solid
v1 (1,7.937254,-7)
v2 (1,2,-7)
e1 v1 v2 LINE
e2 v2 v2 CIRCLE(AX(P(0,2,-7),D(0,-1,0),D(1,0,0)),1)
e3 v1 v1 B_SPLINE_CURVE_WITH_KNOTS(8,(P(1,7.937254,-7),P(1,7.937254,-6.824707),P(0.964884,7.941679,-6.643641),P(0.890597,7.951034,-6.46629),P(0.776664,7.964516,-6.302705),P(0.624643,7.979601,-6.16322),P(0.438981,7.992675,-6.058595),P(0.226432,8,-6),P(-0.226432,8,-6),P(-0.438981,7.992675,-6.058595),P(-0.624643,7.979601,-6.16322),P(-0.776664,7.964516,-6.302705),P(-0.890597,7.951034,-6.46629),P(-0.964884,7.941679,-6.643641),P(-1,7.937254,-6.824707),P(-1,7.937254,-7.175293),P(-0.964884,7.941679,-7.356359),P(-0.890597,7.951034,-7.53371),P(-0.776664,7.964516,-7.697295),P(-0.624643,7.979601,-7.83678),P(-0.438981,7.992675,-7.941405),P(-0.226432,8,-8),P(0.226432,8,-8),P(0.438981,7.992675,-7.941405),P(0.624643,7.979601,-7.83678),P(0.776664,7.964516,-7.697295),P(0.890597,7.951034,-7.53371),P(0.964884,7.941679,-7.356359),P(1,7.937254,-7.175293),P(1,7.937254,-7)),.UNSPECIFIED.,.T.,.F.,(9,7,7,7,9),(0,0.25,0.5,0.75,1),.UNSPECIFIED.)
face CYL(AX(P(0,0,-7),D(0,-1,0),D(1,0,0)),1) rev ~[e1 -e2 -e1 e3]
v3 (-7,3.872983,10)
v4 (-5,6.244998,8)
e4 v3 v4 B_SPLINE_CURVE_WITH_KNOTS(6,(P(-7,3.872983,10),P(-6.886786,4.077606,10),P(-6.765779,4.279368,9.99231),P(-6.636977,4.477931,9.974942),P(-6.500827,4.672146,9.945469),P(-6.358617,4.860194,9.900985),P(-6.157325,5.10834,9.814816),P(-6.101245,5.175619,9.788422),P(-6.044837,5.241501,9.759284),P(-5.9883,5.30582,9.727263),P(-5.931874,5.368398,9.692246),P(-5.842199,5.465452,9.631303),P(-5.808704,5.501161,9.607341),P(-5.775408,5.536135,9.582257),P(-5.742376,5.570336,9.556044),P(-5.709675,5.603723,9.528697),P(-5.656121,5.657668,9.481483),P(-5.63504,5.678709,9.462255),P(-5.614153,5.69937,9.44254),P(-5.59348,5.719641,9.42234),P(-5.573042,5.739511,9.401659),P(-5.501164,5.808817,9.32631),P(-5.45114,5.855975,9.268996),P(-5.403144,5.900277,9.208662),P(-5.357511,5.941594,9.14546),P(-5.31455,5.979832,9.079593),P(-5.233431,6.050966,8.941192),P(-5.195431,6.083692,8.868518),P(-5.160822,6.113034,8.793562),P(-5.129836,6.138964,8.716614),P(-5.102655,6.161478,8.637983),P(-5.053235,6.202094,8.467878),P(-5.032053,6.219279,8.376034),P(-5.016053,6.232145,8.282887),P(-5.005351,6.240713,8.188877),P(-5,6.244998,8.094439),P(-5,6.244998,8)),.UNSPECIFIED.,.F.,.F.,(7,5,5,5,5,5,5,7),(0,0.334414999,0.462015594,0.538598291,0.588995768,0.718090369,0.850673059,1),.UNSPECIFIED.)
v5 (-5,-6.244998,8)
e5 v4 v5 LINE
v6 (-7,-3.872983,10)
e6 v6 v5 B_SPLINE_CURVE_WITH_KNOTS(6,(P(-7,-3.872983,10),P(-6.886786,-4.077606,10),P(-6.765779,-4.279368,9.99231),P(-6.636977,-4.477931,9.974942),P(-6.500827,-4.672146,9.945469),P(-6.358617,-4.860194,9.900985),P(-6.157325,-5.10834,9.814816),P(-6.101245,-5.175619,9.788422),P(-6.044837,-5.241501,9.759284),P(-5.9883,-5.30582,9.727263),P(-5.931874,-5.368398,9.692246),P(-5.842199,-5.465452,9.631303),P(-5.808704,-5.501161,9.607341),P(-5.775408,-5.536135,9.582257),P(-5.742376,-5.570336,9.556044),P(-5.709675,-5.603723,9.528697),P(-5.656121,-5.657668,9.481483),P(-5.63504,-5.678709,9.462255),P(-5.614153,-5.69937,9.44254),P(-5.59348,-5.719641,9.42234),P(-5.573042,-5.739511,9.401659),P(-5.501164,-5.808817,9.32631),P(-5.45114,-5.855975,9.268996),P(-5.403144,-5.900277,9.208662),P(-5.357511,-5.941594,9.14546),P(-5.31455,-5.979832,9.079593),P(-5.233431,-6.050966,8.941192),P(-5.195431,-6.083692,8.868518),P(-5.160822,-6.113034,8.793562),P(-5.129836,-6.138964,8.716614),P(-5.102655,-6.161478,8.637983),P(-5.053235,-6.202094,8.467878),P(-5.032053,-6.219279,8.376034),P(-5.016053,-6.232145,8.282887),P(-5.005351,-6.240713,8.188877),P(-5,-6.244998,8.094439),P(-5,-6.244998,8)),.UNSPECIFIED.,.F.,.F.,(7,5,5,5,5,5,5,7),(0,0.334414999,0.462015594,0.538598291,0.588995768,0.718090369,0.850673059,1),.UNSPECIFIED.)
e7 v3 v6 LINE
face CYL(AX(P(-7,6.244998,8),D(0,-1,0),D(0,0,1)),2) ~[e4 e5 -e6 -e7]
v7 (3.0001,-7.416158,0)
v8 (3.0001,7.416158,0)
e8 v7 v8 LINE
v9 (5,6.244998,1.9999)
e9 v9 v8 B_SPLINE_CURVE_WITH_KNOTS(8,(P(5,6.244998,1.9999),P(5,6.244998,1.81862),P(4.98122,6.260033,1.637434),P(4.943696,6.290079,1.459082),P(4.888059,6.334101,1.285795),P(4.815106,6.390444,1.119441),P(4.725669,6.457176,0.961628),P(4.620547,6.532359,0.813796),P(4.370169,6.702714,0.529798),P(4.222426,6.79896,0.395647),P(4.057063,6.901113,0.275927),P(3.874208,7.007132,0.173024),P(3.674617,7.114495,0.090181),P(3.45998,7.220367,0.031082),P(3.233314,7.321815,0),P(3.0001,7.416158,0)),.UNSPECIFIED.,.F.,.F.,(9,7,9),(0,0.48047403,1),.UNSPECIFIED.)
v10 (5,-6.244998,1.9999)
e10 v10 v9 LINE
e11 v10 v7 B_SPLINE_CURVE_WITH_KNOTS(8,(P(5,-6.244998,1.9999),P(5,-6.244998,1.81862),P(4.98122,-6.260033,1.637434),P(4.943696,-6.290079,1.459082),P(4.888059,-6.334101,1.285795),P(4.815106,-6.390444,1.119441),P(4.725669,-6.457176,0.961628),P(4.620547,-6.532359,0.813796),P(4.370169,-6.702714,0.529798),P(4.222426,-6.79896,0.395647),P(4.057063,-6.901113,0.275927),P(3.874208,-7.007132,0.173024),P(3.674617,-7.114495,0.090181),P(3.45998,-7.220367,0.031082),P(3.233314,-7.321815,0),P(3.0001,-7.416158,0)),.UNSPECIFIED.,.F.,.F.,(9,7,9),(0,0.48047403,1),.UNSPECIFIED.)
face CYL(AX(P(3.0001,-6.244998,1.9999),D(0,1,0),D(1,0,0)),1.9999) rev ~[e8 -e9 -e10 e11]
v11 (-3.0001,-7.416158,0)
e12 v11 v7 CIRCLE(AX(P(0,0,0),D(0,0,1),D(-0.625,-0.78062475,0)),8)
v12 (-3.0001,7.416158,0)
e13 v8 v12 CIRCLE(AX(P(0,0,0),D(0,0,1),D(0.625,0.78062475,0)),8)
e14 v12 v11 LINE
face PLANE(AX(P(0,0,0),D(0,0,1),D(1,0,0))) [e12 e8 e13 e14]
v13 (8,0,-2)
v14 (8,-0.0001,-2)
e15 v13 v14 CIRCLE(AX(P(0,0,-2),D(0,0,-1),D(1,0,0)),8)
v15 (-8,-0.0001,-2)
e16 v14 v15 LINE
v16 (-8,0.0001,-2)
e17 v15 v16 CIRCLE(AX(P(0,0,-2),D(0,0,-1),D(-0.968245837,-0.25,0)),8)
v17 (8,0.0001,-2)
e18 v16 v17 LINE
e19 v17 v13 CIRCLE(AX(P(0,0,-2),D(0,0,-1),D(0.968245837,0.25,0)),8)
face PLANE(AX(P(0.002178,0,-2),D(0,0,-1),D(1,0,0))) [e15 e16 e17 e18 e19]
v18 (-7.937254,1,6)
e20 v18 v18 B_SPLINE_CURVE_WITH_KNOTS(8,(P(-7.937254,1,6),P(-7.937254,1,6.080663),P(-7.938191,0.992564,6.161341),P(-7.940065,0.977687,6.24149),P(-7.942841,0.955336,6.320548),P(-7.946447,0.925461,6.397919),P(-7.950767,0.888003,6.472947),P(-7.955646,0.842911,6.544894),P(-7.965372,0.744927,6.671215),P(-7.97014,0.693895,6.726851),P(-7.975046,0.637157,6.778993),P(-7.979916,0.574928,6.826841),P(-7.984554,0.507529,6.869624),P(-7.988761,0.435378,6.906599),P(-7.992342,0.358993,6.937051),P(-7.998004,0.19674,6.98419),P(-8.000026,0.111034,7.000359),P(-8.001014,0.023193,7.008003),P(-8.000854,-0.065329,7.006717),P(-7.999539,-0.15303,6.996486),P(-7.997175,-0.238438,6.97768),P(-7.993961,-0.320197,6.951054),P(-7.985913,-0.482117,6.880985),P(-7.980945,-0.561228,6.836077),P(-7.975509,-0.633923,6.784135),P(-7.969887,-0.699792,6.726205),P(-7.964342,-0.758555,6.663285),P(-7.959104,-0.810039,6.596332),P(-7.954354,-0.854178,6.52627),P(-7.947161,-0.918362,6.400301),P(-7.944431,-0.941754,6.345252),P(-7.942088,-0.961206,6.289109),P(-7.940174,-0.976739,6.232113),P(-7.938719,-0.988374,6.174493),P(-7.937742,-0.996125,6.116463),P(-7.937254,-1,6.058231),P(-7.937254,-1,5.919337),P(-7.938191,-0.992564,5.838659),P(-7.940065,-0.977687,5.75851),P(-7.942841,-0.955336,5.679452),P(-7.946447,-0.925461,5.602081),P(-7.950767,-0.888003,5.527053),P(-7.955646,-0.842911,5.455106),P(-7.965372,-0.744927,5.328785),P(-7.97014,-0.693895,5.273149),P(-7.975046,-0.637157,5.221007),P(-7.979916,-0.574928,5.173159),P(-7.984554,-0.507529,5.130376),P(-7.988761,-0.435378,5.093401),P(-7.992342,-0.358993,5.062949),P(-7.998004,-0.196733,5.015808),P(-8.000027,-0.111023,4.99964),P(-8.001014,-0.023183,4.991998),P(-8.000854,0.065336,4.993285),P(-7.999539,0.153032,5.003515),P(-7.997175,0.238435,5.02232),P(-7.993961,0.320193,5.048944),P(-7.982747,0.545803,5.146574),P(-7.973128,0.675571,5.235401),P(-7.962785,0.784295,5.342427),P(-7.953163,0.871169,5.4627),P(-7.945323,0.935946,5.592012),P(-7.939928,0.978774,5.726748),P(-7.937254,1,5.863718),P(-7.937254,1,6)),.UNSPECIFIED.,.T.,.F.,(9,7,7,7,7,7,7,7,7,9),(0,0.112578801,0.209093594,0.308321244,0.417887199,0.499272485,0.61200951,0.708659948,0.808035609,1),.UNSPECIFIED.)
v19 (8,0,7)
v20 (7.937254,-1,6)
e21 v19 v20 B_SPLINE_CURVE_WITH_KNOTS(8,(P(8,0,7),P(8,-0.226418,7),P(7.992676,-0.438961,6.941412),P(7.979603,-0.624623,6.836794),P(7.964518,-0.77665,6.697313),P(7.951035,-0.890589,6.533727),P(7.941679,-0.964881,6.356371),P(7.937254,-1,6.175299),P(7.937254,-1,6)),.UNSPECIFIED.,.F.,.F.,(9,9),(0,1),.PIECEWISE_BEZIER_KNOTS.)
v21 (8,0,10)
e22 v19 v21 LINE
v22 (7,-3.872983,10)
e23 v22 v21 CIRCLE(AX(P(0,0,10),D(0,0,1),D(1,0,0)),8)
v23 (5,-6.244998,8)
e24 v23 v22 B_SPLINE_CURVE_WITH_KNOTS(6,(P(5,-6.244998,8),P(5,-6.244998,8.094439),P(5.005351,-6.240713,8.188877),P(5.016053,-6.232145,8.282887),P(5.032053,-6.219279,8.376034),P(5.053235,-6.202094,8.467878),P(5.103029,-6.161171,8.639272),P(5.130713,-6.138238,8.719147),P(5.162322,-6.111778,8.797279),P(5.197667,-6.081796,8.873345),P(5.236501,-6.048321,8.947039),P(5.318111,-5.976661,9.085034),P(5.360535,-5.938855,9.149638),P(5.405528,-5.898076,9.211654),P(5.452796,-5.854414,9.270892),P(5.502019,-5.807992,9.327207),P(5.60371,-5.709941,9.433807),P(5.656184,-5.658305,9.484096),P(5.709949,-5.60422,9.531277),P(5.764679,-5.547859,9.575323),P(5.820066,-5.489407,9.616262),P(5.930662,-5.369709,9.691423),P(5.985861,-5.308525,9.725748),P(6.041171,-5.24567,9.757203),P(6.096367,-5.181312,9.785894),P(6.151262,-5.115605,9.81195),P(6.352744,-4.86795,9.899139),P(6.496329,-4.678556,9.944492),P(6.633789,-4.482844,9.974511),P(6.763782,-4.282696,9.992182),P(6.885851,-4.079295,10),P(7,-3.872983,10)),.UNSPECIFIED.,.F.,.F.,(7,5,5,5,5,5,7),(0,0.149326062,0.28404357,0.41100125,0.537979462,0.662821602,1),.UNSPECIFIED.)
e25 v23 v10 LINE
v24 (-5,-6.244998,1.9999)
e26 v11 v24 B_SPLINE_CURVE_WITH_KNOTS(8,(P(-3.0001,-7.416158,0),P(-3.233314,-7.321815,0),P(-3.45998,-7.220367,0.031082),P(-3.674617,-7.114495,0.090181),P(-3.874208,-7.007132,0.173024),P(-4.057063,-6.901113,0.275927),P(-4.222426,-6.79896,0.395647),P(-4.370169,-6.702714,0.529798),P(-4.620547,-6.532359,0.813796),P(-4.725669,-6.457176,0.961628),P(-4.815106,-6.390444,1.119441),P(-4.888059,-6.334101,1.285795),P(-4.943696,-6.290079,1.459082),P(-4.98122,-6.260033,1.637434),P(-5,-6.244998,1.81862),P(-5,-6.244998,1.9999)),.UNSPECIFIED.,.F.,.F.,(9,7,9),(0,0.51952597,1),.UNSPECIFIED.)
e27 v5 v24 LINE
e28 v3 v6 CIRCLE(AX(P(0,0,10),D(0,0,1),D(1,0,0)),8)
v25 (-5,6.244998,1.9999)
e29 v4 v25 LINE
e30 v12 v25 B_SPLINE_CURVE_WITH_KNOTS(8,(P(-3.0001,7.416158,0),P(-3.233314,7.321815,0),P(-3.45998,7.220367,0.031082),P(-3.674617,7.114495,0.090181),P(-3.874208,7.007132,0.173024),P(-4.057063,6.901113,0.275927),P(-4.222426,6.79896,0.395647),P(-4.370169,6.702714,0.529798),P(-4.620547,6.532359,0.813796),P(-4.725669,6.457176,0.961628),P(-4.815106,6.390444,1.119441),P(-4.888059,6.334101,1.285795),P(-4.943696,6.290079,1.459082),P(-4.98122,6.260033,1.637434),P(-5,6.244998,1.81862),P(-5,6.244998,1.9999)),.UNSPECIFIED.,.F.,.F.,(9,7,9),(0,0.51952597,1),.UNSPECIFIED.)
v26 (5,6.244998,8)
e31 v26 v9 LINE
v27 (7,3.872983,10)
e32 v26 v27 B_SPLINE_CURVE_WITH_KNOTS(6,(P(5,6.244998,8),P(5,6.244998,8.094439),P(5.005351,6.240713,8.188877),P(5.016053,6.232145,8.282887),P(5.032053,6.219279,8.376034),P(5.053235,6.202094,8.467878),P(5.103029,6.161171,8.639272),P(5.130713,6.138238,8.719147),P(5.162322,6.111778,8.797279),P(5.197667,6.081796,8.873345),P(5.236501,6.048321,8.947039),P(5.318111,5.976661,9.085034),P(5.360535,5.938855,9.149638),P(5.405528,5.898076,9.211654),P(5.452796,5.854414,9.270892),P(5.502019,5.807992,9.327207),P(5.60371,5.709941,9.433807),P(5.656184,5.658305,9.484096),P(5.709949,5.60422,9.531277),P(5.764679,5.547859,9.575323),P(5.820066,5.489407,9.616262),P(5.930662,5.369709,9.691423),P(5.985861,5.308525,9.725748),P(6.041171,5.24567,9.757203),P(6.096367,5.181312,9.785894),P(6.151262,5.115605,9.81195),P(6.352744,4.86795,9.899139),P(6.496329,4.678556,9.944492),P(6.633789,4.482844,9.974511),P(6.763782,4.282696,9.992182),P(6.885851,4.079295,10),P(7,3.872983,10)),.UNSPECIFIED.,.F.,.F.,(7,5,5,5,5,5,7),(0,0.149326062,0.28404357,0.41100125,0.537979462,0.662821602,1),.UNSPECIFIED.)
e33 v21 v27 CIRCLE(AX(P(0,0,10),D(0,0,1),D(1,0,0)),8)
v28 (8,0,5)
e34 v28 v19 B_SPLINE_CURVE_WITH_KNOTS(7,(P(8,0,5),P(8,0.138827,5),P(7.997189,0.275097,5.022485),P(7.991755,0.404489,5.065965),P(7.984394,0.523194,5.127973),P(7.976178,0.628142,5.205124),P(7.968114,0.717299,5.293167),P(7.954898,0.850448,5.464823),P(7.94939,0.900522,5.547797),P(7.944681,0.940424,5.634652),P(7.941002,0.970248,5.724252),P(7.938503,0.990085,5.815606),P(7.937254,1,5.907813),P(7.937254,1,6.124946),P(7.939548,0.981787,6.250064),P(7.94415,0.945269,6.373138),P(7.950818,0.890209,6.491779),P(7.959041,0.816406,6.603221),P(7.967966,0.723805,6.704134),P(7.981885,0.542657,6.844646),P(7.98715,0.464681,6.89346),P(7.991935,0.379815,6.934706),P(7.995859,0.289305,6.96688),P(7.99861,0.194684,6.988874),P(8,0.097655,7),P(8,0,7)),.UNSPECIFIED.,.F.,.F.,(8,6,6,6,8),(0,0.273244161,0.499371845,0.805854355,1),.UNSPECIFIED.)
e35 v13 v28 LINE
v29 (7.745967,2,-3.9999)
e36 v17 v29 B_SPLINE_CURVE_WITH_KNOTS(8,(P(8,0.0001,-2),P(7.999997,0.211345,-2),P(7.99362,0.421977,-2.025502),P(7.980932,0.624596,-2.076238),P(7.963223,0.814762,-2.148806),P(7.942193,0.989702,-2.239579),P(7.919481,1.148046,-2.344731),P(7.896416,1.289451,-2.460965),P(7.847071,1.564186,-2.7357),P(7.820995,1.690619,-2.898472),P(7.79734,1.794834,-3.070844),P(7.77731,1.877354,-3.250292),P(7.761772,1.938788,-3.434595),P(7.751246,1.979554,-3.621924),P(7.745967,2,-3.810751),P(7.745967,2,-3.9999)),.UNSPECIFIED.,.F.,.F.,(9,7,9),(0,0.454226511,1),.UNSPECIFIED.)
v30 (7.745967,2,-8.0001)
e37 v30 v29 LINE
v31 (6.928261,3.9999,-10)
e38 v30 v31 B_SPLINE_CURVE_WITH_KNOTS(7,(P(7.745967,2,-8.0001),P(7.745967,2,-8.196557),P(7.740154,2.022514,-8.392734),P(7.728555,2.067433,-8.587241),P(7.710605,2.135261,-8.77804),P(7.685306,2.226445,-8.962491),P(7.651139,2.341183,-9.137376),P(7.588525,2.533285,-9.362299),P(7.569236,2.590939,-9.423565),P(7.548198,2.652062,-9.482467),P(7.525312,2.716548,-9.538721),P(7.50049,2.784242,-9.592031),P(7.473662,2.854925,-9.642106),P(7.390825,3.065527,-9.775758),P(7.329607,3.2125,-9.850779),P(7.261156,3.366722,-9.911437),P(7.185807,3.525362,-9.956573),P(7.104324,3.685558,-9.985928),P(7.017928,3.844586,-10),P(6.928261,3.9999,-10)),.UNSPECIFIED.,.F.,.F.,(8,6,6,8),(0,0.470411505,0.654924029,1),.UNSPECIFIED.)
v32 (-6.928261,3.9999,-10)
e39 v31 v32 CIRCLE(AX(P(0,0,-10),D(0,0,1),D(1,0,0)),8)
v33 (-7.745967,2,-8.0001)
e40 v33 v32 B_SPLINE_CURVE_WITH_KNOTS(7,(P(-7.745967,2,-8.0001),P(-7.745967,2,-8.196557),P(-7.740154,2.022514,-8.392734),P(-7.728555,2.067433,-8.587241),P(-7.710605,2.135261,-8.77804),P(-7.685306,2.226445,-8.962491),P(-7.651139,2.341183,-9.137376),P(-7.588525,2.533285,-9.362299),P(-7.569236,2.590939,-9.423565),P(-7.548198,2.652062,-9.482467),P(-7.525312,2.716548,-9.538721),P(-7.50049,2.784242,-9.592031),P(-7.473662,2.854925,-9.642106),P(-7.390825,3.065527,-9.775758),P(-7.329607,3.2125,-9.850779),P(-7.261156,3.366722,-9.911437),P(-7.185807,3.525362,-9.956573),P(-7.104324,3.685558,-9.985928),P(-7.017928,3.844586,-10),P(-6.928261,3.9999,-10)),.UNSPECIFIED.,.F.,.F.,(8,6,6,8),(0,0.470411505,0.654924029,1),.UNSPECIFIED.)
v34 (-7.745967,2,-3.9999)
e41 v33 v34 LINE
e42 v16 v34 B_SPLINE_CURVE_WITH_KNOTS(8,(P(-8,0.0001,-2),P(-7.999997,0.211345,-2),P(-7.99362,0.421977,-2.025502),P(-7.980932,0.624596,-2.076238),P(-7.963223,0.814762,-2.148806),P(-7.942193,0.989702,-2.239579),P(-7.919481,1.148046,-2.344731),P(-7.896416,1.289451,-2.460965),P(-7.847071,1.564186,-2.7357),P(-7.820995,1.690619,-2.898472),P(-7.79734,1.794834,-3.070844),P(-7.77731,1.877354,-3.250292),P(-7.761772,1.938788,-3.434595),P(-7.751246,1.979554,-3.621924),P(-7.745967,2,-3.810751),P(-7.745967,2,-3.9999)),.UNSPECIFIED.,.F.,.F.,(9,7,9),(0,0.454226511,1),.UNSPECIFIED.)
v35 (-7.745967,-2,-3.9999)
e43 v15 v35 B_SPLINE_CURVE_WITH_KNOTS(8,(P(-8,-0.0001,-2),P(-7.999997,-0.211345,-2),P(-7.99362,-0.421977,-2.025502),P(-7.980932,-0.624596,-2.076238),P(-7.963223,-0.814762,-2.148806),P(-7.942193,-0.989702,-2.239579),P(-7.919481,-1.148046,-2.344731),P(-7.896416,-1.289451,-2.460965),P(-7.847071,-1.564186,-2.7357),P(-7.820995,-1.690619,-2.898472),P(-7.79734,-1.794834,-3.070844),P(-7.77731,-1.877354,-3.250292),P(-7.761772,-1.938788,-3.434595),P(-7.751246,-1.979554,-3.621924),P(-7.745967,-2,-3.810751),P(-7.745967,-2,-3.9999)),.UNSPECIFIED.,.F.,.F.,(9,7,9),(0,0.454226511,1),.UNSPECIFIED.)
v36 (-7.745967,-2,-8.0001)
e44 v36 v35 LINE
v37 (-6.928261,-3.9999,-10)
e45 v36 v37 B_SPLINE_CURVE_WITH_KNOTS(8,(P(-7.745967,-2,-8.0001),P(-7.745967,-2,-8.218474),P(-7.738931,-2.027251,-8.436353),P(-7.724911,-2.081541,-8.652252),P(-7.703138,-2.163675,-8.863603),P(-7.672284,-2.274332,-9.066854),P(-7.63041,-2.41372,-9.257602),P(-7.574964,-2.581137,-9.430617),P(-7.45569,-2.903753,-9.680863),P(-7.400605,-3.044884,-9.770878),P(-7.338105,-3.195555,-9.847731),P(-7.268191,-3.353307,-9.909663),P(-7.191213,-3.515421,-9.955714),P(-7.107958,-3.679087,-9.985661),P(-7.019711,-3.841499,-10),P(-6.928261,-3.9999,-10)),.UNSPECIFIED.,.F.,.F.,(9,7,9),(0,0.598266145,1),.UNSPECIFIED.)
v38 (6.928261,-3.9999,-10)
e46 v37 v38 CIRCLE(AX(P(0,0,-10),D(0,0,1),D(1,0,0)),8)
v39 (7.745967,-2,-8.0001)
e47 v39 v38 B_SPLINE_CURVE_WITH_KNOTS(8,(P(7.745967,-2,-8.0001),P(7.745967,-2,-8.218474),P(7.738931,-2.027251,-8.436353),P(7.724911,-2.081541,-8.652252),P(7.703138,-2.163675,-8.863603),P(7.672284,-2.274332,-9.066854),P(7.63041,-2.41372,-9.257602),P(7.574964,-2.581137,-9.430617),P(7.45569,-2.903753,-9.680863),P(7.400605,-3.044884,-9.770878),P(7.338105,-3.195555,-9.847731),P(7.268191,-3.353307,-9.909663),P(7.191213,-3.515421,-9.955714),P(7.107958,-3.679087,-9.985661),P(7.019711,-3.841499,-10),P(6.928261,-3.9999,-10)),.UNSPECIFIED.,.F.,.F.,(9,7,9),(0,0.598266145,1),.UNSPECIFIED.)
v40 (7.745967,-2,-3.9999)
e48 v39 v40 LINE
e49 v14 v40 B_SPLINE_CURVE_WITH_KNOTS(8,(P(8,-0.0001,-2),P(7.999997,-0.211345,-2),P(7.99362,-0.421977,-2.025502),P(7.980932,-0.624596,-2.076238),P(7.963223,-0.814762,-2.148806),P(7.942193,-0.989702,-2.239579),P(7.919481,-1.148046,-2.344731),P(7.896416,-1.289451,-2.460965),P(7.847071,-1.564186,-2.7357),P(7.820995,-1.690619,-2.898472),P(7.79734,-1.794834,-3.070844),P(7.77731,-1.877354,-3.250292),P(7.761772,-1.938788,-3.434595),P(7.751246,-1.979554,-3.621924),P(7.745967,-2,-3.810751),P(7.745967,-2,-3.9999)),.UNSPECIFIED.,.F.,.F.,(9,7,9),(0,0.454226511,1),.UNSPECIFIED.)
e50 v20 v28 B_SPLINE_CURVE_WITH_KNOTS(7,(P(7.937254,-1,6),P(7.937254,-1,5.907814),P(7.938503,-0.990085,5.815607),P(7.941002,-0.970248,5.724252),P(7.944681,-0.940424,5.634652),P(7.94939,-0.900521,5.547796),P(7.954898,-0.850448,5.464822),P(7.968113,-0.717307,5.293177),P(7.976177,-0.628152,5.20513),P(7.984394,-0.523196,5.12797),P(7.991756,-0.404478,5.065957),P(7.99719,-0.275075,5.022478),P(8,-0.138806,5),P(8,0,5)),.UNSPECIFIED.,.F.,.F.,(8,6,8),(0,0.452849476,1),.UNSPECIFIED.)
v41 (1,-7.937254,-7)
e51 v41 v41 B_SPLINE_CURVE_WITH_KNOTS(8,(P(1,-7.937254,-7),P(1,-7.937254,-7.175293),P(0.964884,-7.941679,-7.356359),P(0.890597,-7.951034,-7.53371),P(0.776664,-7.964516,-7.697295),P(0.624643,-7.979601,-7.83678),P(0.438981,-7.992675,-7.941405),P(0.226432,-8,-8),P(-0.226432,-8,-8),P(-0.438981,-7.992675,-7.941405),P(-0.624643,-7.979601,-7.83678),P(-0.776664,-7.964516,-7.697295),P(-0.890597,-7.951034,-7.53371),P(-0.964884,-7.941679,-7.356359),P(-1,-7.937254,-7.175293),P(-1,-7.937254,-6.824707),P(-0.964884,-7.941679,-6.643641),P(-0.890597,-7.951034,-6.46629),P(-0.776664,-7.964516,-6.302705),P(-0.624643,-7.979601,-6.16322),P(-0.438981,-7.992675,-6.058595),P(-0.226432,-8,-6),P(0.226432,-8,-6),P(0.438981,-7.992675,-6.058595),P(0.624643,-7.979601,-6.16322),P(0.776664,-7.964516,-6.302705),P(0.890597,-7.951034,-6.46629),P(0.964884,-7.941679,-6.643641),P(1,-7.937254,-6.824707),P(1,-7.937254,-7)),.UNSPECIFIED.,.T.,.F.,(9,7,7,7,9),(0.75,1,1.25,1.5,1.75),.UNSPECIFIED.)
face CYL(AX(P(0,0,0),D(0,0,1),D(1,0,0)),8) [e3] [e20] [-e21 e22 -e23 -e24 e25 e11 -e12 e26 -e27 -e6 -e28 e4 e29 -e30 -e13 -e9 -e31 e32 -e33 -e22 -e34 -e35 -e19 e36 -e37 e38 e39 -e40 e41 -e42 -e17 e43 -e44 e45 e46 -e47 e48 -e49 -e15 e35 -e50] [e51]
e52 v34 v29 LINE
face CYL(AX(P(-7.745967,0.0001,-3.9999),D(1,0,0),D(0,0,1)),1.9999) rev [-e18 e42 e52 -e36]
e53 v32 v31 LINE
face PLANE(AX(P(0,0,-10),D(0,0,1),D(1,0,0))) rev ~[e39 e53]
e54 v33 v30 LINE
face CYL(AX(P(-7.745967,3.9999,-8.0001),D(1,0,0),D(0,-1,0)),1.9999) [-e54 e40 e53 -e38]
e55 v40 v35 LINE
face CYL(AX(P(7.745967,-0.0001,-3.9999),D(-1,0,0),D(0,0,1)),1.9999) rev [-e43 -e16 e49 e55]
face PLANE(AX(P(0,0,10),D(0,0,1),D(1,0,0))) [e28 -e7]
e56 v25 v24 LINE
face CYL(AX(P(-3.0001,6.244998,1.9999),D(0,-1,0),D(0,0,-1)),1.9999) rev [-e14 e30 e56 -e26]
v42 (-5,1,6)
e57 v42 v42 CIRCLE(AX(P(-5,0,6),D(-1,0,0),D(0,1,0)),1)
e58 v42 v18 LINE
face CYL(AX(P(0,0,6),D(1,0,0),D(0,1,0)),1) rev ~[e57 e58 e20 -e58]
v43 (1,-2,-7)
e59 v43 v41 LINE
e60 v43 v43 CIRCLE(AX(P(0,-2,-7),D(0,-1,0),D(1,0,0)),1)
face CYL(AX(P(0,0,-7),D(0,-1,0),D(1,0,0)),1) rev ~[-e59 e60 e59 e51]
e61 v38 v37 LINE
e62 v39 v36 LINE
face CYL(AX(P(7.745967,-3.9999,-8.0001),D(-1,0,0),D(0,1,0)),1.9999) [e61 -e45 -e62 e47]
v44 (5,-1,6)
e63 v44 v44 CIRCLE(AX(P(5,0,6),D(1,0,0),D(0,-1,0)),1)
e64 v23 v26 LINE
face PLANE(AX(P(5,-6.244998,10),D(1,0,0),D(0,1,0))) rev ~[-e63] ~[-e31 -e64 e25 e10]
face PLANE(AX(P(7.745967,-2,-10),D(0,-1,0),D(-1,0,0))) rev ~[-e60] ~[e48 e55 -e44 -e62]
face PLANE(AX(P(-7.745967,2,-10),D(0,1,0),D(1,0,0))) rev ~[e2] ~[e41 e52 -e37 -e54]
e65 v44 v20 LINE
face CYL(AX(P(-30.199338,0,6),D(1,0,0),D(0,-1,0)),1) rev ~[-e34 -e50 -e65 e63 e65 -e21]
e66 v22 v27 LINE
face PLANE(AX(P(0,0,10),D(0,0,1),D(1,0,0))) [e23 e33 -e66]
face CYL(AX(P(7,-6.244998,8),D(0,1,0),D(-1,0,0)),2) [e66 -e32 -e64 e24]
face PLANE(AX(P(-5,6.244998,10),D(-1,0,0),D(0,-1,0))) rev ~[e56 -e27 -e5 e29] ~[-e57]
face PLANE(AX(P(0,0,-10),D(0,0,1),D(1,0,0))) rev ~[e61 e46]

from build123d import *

# Parameters (mm, degrees)
F0_R      = 8
F1_DEPTH  = 10
F3_DEPTH  = 10
F5_D      = 2
F5_DEPTH  = 8.001
F6_D      = 2
F7_R      = 2
F9_DEPTH  = 8
F10_R     = 1.9999
F11_R     = 1
F12_DEPTH = 8


# Not quite as in the source:
# - a fillet or chamfer is up to 0.001 mm smaller than in the source, because OpenCascade refuses the exact size
# - a feature names something its author has since deleted; it is built from what else it names


with BuildPart() as f1:
    # F0 (on Top) → F1 (new body, symmetric)
    with BuildSketch(Plane.XY):
        Circle(F0_R)
    extrude(amount=F1_DEPTH, both=True)

    # F2 (on face) → F3 (cut)
    with BuildSketch(Plane.XY.offset(10)):
        with BuildLine():
            ThreePointArc((5, 6.2449979984), (0, 8), (-5, 6.2449979984))
            Line((-5, 6.2449979984), (-5, -6.2449979984))
            ThreePointArc((-5, -6.2449979984), (0, -8), (5, -6.2449979984))
            Line((5, -6.2449979984), (5, 6.2449979984))
        make_face()
    extrude(amount=-F3_DEPTH, mode=Mode.SUBTRACT)

    # F5 (through all, one way)
    with BuildSketch(Plane.YZ):
        with Locations((0, 6)):
            Circle(F5_D / 2)
    extrude(amount=-F5_DEPTH, mode=Mode.SUBTRACT)

    # F6 (through all)
    with Locations(Plane(origin=(0, 0, 0), x_dir=(0, 1, 0), z_dir=(-1, 0, 0))):
        with Locations((0, -6)):
            Hole(F6_D / 2)

    # F7
    f7_edges = [f1.edges().sort_by_distance(p)[0] for p in [
        (5, 0, 10),
        (-5, 0, 10),
    ]]
    fillet(f7_edges, radius=F7_R)

    # F8 (on face) → F9 (cut)
    with BuildSketch(Plane(origin=(0, 0, -10), x_dir=(1, 0, 0), z_dir=(0, 0, -1))):
        with BuildLine():
            Line((7.7459666924, 2), (-7.7459666924, 2))
            ThreePointArc((-7.7459666924, 2), (-8, 0), (-7.7459666924, -2))
            Line((-7.7459666924, -2), (7.7459666924, -2))
            ThreePointArc((7.7459666924, -2), (7.9362375701, -1.0080343399), (8, 0))
            ThreePointArc((8, 0), (7.9362375701, 1.0080343399), (7.7459666924, 2))
        make_face()
    extrude(amount=-F9_DEPTH, mode=Mode.SUBTRACT)

    # F10 (radius 2 in the source; OpenCascade refuses exactly that, so slightly less here)
    f10_edges = [f1.edges().sort_by_distance(p)[0] for p in [
        (0, 2, -10),
        (0, -2, -10),
        (0, -2, -2),
        (0, 2, -2),
        (-5, 0, 0),
        (5, 0, 0),
    ]]
    fillet(f10_edges, radius=F10_R)

    # F11 (on Front) → F12 (cut, symmetric)
    with BuildSketch(Plane.XZ):
        with Locations((0, -7)):
            Circle(F11_R)
    extrude(amount=F12_DEPTH, both=True, mode=Mode.SUBTRACT)


solid = f1.part
